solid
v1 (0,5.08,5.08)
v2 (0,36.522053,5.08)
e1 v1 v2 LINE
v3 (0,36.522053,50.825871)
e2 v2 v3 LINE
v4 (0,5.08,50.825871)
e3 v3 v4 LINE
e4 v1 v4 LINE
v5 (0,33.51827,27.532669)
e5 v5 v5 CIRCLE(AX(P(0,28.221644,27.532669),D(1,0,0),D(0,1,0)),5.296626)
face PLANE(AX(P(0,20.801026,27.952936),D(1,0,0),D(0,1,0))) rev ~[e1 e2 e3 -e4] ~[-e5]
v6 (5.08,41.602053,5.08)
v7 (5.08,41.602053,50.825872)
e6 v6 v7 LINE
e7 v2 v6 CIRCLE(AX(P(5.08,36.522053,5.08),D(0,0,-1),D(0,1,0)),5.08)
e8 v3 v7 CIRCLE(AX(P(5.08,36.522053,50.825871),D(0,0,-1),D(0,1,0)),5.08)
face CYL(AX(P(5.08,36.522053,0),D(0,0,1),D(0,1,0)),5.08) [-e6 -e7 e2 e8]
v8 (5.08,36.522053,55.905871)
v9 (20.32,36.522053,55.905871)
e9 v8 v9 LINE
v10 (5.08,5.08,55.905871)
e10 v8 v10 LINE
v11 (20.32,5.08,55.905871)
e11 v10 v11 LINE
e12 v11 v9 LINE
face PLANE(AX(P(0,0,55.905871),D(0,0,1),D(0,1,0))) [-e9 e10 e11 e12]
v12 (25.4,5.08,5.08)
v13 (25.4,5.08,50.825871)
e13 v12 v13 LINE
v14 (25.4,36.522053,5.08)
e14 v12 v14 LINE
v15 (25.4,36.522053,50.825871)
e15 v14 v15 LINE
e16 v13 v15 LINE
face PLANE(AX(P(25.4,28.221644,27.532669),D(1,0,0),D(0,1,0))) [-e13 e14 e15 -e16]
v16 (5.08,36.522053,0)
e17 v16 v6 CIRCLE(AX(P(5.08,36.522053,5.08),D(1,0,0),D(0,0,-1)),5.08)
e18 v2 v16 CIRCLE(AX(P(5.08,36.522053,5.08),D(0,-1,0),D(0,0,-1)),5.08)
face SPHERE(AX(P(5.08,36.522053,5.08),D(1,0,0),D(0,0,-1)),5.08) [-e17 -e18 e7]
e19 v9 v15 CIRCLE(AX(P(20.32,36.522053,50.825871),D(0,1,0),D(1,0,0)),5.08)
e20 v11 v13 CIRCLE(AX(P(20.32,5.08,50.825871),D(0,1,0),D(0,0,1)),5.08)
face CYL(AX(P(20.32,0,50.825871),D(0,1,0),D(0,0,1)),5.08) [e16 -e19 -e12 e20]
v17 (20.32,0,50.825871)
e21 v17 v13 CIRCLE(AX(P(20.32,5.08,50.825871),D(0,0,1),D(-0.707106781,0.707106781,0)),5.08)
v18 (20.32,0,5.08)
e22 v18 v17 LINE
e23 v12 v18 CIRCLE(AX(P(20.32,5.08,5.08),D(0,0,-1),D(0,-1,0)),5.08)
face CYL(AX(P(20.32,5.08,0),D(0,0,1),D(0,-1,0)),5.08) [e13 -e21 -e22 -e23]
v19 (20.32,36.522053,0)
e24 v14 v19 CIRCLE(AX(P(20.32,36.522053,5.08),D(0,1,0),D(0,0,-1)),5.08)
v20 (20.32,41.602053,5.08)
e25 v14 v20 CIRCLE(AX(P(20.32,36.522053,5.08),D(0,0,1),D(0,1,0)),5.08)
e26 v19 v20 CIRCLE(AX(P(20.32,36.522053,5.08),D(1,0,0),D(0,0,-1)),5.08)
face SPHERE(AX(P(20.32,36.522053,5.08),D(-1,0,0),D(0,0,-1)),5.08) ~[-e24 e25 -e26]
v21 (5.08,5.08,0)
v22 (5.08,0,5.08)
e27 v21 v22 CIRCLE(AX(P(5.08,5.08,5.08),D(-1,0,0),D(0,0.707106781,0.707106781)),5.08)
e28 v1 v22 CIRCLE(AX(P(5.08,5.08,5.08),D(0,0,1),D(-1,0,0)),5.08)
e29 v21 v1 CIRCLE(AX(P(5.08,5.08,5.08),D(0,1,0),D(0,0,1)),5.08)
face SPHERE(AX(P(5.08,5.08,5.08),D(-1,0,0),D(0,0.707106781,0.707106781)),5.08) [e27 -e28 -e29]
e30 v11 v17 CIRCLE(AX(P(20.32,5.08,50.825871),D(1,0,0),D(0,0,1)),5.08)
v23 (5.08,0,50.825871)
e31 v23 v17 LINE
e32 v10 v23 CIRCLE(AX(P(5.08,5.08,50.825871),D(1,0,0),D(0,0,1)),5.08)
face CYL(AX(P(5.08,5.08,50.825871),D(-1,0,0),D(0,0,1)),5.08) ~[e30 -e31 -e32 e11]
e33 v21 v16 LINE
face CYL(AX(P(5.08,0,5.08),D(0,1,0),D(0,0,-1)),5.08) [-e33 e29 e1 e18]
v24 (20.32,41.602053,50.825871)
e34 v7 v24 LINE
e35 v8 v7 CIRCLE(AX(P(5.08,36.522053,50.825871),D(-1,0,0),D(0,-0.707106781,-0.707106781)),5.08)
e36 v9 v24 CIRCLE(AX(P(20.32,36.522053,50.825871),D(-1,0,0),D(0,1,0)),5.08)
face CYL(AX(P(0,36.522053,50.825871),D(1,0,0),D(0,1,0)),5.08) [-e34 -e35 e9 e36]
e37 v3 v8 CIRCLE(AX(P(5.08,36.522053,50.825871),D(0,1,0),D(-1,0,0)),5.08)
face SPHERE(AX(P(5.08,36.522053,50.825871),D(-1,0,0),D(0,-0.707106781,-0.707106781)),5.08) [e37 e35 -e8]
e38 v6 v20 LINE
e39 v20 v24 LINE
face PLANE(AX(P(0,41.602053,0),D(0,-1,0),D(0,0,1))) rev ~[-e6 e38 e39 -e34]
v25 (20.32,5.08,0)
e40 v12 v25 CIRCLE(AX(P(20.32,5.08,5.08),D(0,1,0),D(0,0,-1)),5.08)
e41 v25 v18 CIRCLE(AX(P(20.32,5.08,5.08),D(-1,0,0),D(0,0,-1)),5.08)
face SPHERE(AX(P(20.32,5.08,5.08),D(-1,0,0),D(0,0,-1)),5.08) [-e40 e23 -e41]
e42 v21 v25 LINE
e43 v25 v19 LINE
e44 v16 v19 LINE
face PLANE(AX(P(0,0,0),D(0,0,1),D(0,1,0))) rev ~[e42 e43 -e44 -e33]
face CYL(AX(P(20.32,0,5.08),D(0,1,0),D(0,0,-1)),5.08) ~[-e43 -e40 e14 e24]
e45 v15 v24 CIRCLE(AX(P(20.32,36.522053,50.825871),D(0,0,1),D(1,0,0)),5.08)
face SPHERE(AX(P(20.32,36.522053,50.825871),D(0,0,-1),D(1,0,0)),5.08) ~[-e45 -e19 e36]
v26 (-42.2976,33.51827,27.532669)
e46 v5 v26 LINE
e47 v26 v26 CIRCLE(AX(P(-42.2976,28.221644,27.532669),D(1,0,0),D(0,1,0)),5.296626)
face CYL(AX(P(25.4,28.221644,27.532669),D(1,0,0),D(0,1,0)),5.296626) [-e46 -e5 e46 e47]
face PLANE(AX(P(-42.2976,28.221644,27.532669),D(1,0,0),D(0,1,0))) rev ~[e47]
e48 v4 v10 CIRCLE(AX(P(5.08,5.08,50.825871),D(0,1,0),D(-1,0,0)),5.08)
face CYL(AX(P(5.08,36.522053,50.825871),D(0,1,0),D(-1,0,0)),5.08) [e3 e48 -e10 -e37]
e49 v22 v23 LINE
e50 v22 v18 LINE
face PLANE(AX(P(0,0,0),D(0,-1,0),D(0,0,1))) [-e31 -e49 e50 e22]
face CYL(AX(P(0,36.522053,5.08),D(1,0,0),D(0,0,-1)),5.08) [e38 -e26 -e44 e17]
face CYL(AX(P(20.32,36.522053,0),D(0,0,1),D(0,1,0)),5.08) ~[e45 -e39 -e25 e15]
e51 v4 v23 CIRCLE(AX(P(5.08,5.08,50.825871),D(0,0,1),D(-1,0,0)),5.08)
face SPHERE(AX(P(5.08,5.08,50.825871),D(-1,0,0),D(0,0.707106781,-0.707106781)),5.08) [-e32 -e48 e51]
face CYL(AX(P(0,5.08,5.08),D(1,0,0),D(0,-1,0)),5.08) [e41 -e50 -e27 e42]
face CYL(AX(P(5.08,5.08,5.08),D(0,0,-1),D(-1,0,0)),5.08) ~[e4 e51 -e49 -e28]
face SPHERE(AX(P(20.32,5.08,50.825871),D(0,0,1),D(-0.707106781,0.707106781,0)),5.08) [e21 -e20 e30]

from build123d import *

# Parameters (mm, degrees)
F2_W         = 41.6020527482
F2_H         = 55.9058710933
F3_DEPTH     = 25.4
F4_R         = 5.08
F5_T1_DEPTH  = 45.7458710933
F5_T3_DEPTH  = 31.4420527482
F5_T5_DEPTH  = 15.24
F5_S9_W      = 5.08
F5_S9_H      = 5.08
F5_T10_DEPTH = 5.08
F5_S15_W     = 5.08
F5_S15_H     = 5.08
F5_T16_DEPTH = 5.08
F5_S21_W     = 5.08
F5_S21_H     = 5.08
F5_T22_DEPTH = 5.08
F5_S27_W     = 5.08
F5_S27_H     = 5.08
F5_T28_DEPTH = 5.08
F7_DEPTH     = 25.4
F8_R         = 5.2966255489
F9_DEPTH     = 67.6975995302


# Not quite as in the source:
# - a fillet or chamfer that OpenCascade refuses, or shapes differently, is made with other operations: its cross-section is extruded or revolved along the edge and cut away or added


with BuildPart() as f3:
    # F2 (on face) → F3 (new body)
    with BuildSketch(Plane.YZ):
        with Locations((20.8010263741, 27.9529355466)):
            Rectangle(F2_W, F2_H)
    extrude(amount=F3_DEPTH)

    # F4
    f4_edges = [f3.edges().sort_by_distance(p)[0] for p in [
        (12.7, 0, 0),
        (12.7, 41.602053, 0),
        (0, 20.801026, 0),
        (25.4, 20.801026, 0),
        (25.4, 41.602053, 27.952936),
        (25.4, 20.801026, 55.905871),
        (25.4, 0, 27.952936),
        (12.7, 41.602053, 55.905871),
        (0, 41.602053, 27.952936),
    ]]
    fillet(f4_edges, radius=F4_R)

    # F5: fillet of radius 5.08 on 3 edges, made by hand

    # F5_s2 → F5_t1 (cut)
    with BuildSketch(Plane.XY.offset(5.08)):
        with BuildLine():
            ThreePointArc((0, 5.08), (1.4878975516, 1.4878975516), (5.08, 0))
            Line((5.08, 0), (0, 0))
            Line((0, 0), (0, 5.08))
        make_face()
    extrude(amount=F5_T1_DEPTH, mode=Mode.SUBTRACT)

    # F5_s4 → F5_t3 (cut)
    with BuildSketch(Plane.XZ.offset(-36.5220527482)):
        with BuildLine():
            ThreePointArc((0, 50.8258710933), (1.4878975516, 54.4179735417), (5.08, 55.9058710933))
            Line((5.08, 55.9058710933), (0, 55.9058710933))
            Line((0, 55.9058710933), (0, 50.8258710933))
        make_face()
    extrude(amount=F5_T3_DEPTH, mode=Mode.SUBTRACT)

    # F5_s6 → F5_t5 (cut)
    with BuildSketch(Plane.YZ.offset(5.08)):
        with BuildLine():
            ThreePointArc((5.08, 55.9058710933), (1.4878975516, 54.4179735417), (0, 50.8258710933))
            Line((0, 50.8258710933), (0, 55.9058710933))
            Line((0, 55.9058710933), (5.08, 55.9058710933))
        make_face()
    extrude(amount=F5_T5_DEPTH, mode=Mode.SUBTRACT)


with BuildPart() as f5_tool8:
    # F5_s9 → F5_t10 (new body)
    with BuildSketch(Plane.XY.offset(50.8258710933)):
        with Locations((22.86, 2.54)):
            Rectangle(F5_S9_W, F5_S9_H)
    extrude(amount=F5_T10_DEPTH)

    # F5_s11 → F5_t12 (revolve, cut)
    with BuildSketch(Plane(origin=(20.32, 5.08, 50.8258710933), x_dir=(-0.7071067812, 0.7071067812, 0), z_dir=(0.7071067812, 0.7071067812, 0))):
        with BuildLine():
            ThreePointArc((0, -5.08), (5.08, 0), (0, 5.08))
            Line((0, 5.08), (0, -5.08))
        make_face()
    revolve(axis=Axis((20.32, 5.08, 50.8258710933), (0, 0, 1)), mode=Mode.SUBTRACT)


with BuildPart() as f3_1:
    add(f3.part)

    # F5_t7: cut F5_tool8
    add(f5_tool8.part, mode=Mode.SUBTRACT)


with BuildPart() as f5_tool14:
    # F5_s15 → F5_t16 (new body)
    with BuildSketch(Plane.YZ.offset(5.08)):
        with Locations((39.0620527482, 53.3658710933)):
            Rectangle(F5_S15_W, F5_S15_H)
    extrude(amount=-F5_T16_DEPTH)

    # F5_s17 → F5_t18 (revolve, cut)
    with BuildSketch(Plane(origin=(5.08, 36.5220527482, 50.8258710933), x_dir=(0, -0.7071067812, -0.7071067812), z_dir=(0, 0.7071067812, -0.7071067812))):
        with BuildLine():
            ThreePointArc((0, -5.08), (5.08, 0), (0, 5.08))
            Line((0, 5.08), (0, -5.08))
        make_face()
    revolve(axis=Axis((5.08, 36.5220527482, 50.8258710933), (-1, 0, 0)), mode=Mode.SUBTRACT)


with BuildPart() as f3_2:
    add(f3_1.part)

    # F5_t13: cut F5_tool14
    add(f5_tool14.part, mode=Mode.SUBTRACT)


with BuildPart() as f5_tool20:
    # F5_s21 → F5_t22 (new body)
    with BuildSketch(Plane.YZ.offset(5.08)):
        with Locations((2.54, 2.54)):
            Rectangle(F5_S21_W, F5_S21_H)
    extrude(amount=-F5_T22_DEPTH)

    # F5_s23 → F5_t24 (revolve, cut)
    with BuildSketch(Plane(origin=(5.08, 5.08, 5.08), x_dir=(0, 0.7071067812, 0.7071067812), z_dir=(0, -0.7071067812, 0.7071067812))):
        with BuildLine():
            ThreePointArc((0, -5.08), (5.08, 0), (0, 5.08))
            Line((0, 5.08), (0, -5.08))
        make_face()
    revolve(axis=Axis((5.08, 5.08, 5.08), (-1, 0, 0)), mode=Mode.SUBTRACT)


with BuildPart() as f3_3:
    add(f3_2.part)

    # F5_t19: cut F5_tool20
    add(f5_tool20.part, mode=Mode.SUBTRACT)


with BuildPart() as f5_tool26:
    # F5_s27 → F5_t28 (new body)
    with BuildSketch(Plane.YZ.offset(5.08)):
        with Locations((2.54, 53.3658710933)):
            Rectangle(F5_S27_W, F5_S27_H)
    extrude(amount=-F5_T28_DEPTH)

    # F5_s29 → F5_t30 (revolve, cut)
    with BuildSketch(Plane(origin=(5.08, 5.08, 50.8258710933), x_dir=(0, 0.7071067812, -0.7071067812), z_dir=(0, 0.7071067812, 0.7071067812))):
        with BuildLine():
            ThreePointArc((0, -5.08), (5.08, 0), (0, 5.08))
            Line((0, 5.08), (0, -5.08))
        make_face()
    revolve(axis=Axis((5.08, 5.08, 50.8258710933), (-1, 0, 0)), mode=Mode.SUBTRACT)


with BuildPart() as f3_4:
    add(f3_3.part)

    # F5_t25: cut F5_tool26
    add(f5_tool26.part, mode=Mode.SUBTRACT)

    # F6 (on face) → F7 (cut)
    with BuildSketch(Plane.YZ.offset(25.4)):
        with BuildLine():
            ThreePointArc((28.6198008208, 24.1723779255), (30.5921769571, 25.8541960079), (31.3290304018, 28.3393170685))
            ThreePointArc((31.3290304018, 28.3393170685), (28.3928704941, 32.5997711108), (23.3662914361, 31.3725764954))
            ThreePointArc((23.3662914361, 31.3725764954), (26.7699286342, 28.3393170685), (28.6198008208, 24.1723779255))
        make_face()
        with BuildLine():
            ThreePointArc((28.6198008208, 24.1723779255), (26.7699286342, 28.3393170685), (23.3662914361, 31.3725764954))
            ThreePointArc((23.3662914361, 31.3725764954), (23.0869595481, 25.652097755), (28.6198008208, 24.1723779255))
        make_face()
        with BuildLine():
            ThreePointArc((28.6198008208, 24.1723779255), (23.0869595481, 25.652097755), (23.3662914361, 31.3725764954))
            ThreePointArc((23.3662914361, 31.3725764954), (8.7034109088, 16.5279412286), (28.8466709714, 21.9696629792))
            ThreePointArc((28.8466709714, 21.9696629792), (28.7898038098, 23.0768467038), (28.6198008208, 24.1723779255))
        make_face()
    extrude(amount=F7_DEPTH, mode=Mode.SUBTRACT)

    # F8 (on face) → F9 (join)
    with BuildSketch(Plane.YZ.offset(25.4)):
        with Locations((28.2216444612, 27.5326687843)):
            Circle(F8_R)
    extrude(amount=-F9_DEPTH)


solid = f3_4.part
